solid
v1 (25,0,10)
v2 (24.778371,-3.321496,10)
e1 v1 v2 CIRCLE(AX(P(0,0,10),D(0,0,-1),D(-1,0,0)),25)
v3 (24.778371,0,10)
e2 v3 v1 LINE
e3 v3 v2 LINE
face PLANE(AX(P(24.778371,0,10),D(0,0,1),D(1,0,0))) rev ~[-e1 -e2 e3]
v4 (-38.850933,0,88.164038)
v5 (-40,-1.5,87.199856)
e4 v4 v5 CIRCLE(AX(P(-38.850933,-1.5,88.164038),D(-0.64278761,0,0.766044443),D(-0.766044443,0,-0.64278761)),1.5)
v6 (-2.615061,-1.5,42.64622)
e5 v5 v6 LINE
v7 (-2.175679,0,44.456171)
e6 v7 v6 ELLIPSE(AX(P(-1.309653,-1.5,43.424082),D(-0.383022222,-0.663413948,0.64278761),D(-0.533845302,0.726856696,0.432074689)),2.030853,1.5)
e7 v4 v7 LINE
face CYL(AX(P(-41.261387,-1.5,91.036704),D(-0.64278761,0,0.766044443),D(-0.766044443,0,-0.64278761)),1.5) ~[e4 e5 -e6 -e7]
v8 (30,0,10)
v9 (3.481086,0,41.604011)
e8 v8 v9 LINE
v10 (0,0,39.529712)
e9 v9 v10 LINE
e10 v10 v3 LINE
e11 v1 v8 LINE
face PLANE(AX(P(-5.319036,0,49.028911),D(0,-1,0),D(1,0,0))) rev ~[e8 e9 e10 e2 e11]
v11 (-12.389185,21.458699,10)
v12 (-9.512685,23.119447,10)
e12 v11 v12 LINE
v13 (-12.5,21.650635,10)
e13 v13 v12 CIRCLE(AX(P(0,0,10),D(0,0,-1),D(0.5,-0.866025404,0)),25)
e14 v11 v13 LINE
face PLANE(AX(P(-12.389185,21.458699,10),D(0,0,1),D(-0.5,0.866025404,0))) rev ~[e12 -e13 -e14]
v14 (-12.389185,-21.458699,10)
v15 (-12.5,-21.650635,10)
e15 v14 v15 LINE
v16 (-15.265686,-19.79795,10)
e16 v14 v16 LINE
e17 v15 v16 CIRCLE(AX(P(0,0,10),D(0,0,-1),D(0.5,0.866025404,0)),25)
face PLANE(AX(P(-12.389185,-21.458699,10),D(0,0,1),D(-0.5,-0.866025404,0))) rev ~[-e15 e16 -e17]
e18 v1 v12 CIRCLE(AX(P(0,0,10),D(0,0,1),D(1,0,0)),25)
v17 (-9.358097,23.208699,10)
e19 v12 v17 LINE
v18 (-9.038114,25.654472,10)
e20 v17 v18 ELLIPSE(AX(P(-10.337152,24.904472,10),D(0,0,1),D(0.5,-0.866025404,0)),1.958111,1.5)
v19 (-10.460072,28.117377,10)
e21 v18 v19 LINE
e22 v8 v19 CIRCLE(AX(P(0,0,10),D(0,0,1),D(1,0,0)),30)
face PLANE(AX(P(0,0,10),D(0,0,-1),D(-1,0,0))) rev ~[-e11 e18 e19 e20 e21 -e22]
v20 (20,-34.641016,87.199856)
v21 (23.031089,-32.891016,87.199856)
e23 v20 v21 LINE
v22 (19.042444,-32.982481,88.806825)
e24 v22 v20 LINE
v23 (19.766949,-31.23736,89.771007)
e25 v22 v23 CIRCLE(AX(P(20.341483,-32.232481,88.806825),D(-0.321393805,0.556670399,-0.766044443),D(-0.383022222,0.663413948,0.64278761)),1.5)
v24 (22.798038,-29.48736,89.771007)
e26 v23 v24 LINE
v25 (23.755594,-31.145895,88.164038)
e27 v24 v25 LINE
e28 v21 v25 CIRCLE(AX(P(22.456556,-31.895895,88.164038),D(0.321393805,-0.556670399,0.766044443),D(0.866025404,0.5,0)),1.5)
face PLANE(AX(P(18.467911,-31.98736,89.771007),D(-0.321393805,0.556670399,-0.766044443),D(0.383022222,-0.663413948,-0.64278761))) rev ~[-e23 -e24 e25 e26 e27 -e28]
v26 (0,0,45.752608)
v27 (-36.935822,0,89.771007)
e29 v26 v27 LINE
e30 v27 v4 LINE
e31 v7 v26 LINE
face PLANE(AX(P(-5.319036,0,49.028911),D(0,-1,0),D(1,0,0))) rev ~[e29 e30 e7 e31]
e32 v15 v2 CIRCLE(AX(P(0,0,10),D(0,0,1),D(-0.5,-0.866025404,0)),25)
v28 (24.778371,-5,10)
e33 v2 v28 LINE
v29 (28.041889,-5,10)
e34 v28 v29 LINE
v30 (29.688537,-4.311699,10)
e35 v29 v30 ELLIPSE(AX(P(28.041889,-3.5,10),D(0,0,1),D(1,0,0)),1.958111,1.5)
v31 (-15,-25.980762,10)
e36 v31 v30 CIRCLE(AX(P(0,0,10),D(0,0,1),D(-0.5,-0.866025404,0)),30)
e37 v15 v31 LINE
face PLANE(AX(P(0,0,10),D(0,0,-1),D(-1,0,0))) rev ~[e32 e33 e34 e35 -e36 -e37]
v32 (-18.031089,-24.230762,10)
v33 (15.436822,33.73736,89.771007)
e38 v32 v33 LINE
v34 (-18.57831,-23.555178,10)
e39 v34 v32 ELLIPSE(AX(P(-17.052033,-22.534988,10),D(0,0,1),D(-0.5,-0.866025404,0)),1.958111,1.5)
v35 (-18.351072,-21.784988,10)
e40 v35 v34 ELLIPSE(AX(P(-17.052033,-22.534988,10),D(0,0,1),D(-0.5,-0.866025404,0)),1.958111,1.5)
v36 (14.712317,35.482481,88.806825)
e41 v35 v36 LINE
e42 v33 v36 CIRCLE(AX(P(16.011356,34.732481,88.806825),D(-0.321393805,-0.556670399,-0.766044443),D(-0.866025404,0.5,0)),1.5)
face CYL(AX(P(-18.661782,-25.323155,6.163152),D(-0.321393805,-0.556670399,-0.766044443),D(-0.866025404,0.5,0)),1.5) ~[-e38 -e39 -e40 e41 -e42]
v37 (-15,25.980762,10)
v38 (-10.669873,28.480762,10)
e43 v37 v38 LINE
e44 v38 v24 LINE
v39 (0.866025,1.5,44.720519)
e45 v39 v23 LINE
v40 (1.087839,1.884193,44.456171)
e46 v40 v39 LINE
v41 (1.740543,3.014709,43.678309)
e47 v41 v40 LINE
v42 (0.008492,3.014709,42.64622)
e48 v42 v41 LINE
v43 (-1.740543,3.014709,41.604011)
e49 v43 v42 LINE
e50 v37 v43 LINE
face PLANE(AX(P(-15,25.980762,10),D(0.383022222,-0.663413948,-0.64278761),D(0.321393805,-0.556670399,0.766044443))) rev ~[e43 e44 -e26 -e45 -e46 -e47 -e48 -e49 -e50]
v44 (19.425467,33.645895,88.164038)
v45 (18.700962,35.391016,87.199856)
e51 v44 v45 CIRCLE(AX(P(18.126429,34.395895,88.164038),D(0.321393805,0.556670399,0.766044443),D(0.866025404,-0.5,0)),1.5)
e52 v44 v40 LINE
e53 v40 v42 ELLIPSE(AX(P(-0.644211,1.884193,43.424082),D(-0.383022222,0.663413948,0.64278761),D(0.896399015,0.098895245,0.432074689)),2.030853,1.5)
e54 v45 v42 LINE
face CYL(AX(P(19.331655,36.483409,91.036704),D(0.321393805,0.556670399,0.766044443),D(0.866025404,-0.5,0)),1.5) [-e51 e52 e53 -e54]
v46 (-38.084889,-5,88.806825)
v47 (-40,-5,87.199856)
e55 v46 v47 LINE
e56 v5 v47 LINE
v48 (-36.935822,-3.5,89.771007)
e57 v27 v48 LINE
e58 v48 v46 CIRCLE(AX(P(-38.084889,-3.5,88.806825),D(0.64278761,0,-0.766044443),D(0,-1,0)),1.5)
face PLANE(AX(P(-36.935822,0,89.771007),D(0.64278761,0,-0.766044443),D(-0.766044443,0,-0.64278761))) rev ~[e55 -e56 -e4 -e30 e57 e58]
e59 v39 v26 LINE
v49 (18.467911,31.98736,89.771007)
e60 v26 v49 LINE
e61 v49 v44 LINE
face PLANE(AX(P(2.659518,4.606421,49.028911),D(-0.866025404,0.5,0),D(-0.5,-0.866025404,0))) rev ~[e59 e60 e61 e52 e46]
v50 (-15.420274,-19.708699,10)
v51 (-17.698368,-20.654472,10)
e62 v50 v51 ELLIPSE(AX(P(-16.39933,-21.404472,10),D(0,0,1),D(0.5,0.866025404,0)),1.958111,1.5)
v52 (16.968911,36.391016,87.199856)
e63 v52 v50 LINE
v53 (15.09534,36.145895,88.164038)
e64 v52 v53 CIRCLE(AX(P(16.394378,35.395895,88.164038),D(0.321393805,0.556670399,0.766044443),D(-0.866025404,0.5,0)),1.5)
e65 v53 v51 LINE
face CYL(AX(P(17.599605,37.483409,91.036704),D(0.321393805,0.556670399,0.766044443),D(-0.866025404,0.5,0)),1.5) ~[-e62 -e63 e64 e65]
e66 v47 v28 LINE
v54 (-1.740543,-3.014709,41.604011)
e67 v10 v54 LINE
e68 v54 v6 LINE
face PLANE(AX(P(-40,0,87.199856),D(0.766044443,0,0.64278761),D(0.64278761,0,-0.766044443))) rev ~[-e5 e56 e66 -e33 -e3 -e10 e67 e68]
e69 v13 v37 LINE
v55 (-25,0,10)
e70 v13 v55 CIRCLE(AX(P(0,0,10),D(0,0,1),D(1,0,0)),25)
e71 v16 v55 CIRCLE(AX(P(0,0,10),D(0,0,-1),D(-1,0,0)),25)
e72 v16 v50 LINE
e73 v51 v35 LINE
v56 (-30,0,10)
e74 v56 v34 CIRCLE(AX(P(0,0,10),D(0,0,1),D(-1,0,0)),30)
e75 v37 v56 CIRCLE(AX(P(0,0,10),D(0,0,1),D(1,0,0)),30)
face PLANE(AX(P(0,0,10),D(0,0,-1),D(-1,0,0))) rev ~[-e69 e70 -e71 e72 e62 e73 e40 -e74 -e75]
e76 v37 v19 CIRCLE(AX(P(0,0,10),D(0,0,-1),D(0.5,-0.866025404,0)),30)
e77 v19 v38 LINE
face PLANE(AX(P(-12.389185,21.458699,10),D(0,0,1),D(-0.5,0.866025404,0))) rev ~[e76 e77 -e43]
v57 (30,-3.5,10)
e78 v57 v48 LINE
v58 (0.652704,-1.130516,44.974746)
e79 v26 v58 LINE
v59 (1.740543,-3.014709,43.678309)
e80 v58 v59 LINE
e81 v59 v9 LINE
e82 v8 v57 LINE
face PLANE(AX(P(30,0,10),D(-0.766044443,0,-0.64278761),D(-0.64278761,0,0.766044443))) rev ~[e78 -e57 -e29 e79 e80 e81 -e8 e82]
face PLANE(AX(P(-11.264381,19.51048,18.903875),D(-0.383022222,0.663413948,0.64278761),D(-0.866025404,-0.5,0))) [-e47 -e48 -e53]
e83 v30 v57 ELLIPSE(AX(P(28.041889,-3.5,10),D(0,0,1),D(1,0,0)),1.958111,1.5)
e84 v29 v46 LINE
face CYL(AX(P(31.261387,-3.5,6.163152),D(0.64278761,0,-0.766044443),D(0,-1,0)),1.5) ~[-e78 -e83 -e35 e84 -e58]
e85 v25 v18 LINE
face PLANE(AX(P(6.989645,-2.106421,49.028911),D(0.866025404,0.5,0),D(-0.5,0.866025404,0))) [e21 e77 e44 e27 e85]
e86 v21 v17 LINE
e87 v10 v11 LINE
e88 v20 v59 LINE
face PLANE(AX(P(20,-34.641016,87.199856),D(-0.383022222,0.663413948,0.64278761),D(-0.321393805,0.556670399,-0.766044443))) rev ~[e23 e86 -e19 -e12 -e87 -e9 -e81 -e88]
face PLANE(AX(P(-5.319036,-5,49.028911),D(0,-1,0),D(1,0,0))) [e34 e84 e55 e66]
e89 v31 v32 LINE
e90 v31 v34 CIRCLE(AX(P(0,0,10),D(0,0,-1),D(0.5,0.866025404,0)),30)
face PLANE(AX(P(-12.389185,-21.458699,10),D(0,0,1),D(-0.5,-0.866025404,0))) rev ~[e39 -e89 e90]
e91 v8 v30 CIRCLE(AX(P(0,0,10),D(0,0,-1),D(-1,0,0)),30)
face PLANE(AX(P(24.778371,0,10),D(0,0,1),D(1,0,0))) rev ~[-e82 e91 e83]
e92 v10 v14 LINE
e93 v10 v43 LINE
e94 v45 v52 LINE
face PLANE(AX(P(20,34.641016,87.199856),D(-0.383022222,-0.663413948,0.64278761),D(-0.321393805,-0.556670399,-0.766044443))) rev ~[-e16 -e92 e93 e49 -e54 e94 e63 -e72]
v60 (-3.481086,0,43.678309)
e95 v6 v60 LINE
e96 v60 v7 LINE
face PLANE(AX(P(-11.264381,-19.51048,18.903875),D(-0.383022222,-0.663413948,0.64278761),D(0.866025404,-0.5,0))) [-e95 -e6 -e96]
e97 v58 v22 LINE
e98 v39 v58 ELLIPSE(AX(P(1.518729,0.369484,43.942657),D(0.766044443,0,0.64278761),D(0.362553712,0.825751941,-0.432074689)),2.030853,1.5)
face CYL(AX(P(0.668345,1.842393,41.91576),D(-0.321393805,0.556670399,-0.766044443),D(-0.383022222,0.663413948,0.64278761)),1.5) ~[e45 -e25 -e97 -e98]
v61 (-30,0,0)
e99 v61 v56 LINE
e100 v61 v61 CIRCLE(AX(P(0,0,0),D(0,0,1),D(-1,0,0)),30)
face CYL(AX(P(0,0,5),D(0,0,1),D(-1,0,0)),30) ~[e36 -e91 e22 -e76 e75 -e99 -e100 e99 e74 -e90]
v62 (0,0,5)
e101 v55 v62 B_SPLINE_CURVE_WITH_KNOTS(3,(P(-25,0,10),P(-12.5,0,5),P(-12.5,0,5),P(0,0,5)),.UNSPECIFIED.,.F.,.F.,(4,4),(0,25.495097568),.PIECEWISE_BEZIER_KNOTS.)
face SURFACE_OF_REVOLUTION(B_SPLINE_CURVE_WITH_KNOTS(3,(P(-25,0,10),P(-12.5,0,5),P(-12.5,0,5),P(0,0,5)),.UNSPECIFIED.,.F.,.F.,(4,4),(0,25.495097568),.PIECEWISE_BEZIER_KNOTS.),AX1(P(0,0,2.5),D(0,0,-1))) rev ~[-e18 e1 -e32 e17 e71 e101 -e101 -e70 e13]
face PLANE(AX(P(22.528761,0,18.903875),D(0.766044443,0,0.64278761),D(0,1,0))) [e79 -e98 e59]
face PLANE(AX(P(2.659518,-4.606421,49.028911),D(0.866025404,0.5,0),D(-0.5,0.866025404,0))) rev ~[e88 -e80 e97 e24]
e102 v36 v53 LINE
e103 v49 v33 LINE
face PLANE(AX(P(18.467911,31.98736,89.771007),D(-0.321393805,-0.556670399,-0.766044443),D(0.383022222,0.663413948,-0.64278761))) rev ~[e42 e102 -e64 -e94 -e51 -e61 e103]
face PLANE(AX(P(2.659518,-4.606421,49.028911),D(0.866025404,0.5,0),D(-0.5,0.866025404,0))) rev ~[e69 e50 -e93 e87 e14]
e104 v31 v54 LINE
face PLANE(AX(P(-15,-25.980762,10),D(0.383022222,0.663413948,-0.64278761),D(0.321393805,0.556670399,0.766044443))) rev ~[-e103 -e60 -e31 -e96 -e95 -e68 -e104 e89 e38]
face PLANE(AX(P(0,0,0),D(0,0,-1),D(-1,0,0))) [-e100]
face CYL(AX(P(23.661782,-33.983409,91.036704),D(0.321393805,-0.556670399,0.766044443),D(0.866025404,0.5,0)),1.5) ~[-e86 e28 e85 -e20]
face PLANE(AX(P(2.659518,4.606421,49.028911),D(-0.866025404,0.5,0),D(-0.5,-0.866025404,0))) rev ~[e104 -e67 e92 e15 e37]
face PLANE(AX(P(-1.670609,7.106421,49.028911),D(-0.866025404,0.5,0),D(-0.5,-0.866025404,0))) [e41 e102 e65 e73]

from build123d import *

# Parameters (mm, degrees)
F0_W         = 5
F0_H         = 10
F3_DEPTH     = 5
F4_COUNT     = 3
F5_T4_DEPTH  = 64.961938704
F5_T9_DEPTH  = 108.2772549851
F5_T14_DEPTH = 111.6336535099
F5_T19_DEPTH = 111.6336535099
F5_T24_DEPTH = 64.3133444777
F5_T29_DEPTH = 64.3133444777
F5_T34_DEPTH = 108.2772549851


# Not quite as in the source:
# - a fillet or chamfer that OpenCascade refuses, or shapes differently, is made with other operations: its cross-section is extruded or revolved along the edge and cut away or added


with BuildPart() as f1:
    # F0 (on Front) → F1 (revolve)
    with BuildSketch(Plane.XZ):
        with Locations((-27.5, 5)):
            Rectangle(F0_W, F0_H)
        with BuildLine():
            Line((-25, 10), (-25, 0))
            Line((-25, 0), (0, 0))
            Line((0, 0), (0, 5))
            add(Edge.make_bspline(
                [(-25, 10), (-12.5, 5), (-12.5, 5), (0, 5)],
                knots=[0, 0, 0, 0, 25.495097568, 25.495097568, 25.495097568, 25.495097568], degree=3))
        make_face()
    revolve(axis=Axis((0, 0, 2.5), (0, 0, -1)))

    # F2 (on Front) → F3 (join)
    with BuildSketch(Plane.XZ):
        Polygon((24.7783708427, 10), (30, 10), (-36.9358222275, 89.7710066129), (-40, 87.1998561742), align=None)
    extrude(amount=F3_DEPTH)

    # F4: F1 ×3 about axis
    f4_axis = Axis((0, 0, 2.5), (0, 0, -1))


with BuildPart() as f1_1:
    add(f1.part)
    for i in range(1, F4_COUNT):
        add(f1.part.rotate(f4_axis, i * 360 / F4_COUNT))

    # F5: fillet of radius 1.5 on 7 edges, made by hand


with BuildPart() as f5_tool2:
    # F5_s3 → F5_t4 (new body)
    with BuildSketch(Plane(origin=(10.0591539469, -17.4229657171, 23.9760657093), x_dir=(0.8660254038, 0.5, 0), z_dir=(0.3213938048, -0.5566703992, 0.7660444431))):
        with BuildLine():
            ThreePointArc((1.5, 29.4092093904), (0.4393398282, 28.9698695622), (0, 27.9092093904))
            Line((0, 27.9092093904), (0, 29.4092093904))
            Line((0, 29.4092093904), (1.5, 29.4092093904))
        make_face()
    extrude(amount=F5_T4_DEPTH)

    split(bisect_by=Plane(origin=(22.5287614301, 0, 18.9038754068), x_dir=(0, 1, 0), z_dir=(0.7660444431, 0, 0.6427876097)), keep=Keep.TOP)


with BuildPart() as f1_2:
    add(f1_1.part)

    # F5_t1: cut F5_tool2
    add(f5_tool2.part, mode=Mode.SUBTRACT)


with BuildPart() as f5_tool7:
    # F5_s8 → F5_t9 (new body)
    with BuildSketch(Plane(origin=(30.937518597, -53.58535407, 73.7397978677), x_dir=(-0.8660254038, -0.5, 0), z_dir=(-0.3213938048, 0.5566703992, -0.7660444431))):
        with BuildLine():
            ThreePointArc((-5, 26.9092093904), (-4.5606601718, 25.8485492187), (-3.5, 25.4092093904))
            Line((-3.5, 25.4092093904), (-5, 25.4092093904))
            Line((-5, 25.4092093904), (-5, 26.9092093904))
        make_face()
    extrude(amount=F5_T9_DEPTH)

    split(bisect_by=Plane.XY.offset(10), keep=Keep.TOP)


with BuildPart() as f1_3:
    add(f1_2.part)

    # F5_t6: cut F5_tool7
    add(f5_tool7.part, mode=Mode.SUBTRACT)


with BuildPart() as f5_tool12:
    # F5_s13 → F5_t14 (new body)
    with BuildSketch(Plane(origin=(9.8816921063, 0, -11.7765420685), x_dir=(0, 1, 0), z_dir=(-0.6427876097, 0, 0.7660444431))):
        with BuildLine():
            ThreePointArc((-5, -27.9092093904), (-4.5606601718, -28.9698695622), (-3.5, -29.4092093904))
            Line((-3.5, -29.4092093904), (-5, -29.4092093904))
            Line((-5, -29.4092093904), (-5, -27.9092093904))
        make_face()
    extrude(amount=F5_T14_DEPTH)

    split(bisect_by=Plane.XY.offset(10), keep=Keep.TOP)


with BuildPart() as f1_4:
    add(f1_3.part)

    # F5_t11: cut F5_tool12
    add(f5_tool12.part, mode=Mode.SUBTRACT)


with BuildPart() as f5_tool17:
    # F5_s18 → F5_t19 (new body)
    with BuildSketch(Plane(origin=(-4.9408460531, -8.5577963964, -11.7765420685), x_dir=(-0.8660254038, 0.5, 0), z_dir=(0.3213938048, 0.5566703992, 0.7660444431))):
        with BuildLine():
            ThreePointArc((5, 27.9092093904), (4.5606601718, 28.9698695622), (3.5, 29.4092093904))
            Line((3.5, 29.4092093904), (5, 29.4092093904))
            Line((5, 29.4092093904), (5, 27.9092093904))
        make_face()
    extrude(amount=F5_T19_DEPTH)

    split(bisect_by=Plane.XY.offset(10), keep=Keep.TOP)


with BuildPart() as f1_5:
    add(f1_4.part)

    # F5_t16: cut F5_tool17
    add(f5_tool17.part, mode=Mode.SUBTRACT)


with BuildPart() as f5_tool22:
    # F5_s23 → F5_t24 (new body)
    with BuildSketch(Plane(origin=(-61.8750371939, 0, 73.7397978677), x_dir=(0, 1, 0), z_dir=(0.6427876097, 0, -0.7660444431))):
        with BuildLine():
            ThreePointArc((-1.5, 25.4092093904), (-0.4393398282, 25.8485492187), (0, 26.9092093904))
            Line((0, 26.9092093904), (0, 25.4092093904))
            Line((0, 25.4092093904), (-1.5, 25.4092093904))
        make_face()
    extrude(amount=F5_T24_DEPTH)

    split(bisect_by=Plane(origin=(-11.264380715, -19.5104797142, 18.9038754068), x_dir=(0.8660254038, -0.5, 0), z_dir=(-0.3830222216, -0.6634139482, 0.6427876097)), keep=Keep.TOP)


with BuildPart() as f1_6:
    add(f1_5.part)

    # F5_t21: cut F5_tool22
    add(f5_tool22.part, mode=Mode.SUBTRACT)


with BuildPart() as f5_tool27:
    # F5_s28 → F5_t29 (new body)
    with BuildSketch(Plane(origin=(30.937518597, 53.58535407, 73.7397978677), x_dir=(0.8660254038, -0.5, 0), z_dir=(-0.3213938048, -0.5566703992, -0.7660444431))):
        with BuildLine():
            ThreePointArc((0, 26.9092093904), (-0.4393398282, 25.8485492187), (-1.5, 25.4092093904))
            Line((-1.5, 25.4092093904), (0, 25.4092093904))
            Line((0, 25.4092093904), (0, 26.9092093904))
        make_face()
    extrude(amount=F5_T29_DEPTH)

    split(bisect_by=Plane(origin=(-11.264380715, 19.5104797142, 18.9038754068), x_dir=(-0.8660254038, -0.5, 0), z_dir=(-0.3830222216, 0.6634139482, 0.6427876097)), keep=Keep.TOP)


with BuildPart() as f1_7:
    add(f1_6.part)

    # F5_t26: cut F5_tool27
    add(f5_tool27.part, mode=Mode.SUBTRACT)


with BuildPart() as f5_tool32:
    # F5_s33 → F5_t34 (new body)
    with BuildSketch(Plane(origin=(30.937518597, 53.58535407, 73.7397978677), x_dir=(0.8660254038, -0.5, 0), z_dir=(-0.3213938048, -0.5566703992, -0.7660444431))):
        with BuildLine():
            ThreePointArc((-5, 26.9092093904), (-4.5606601718, 25.8485492187), (-3.5, 25.4092093904))
            Line((-3.5, 25.4092093904), (-5, 25.4092093904))
            Line((-5, 25.4092093904), (-5, 26.9092093904))
        make_face()
    extrude(amount=F5_T34_DEPTH)

    split(bisect_by=Plane.XY.offset(10), keep=Keep.TOP)


with BuildPart() as f1_8:
    add(f1_7.part)

    # F5_t31: cut F5_tool32
    add(f5_tool32.part, mode=Mode.SUBTRACT)


solid = f1_8.part
